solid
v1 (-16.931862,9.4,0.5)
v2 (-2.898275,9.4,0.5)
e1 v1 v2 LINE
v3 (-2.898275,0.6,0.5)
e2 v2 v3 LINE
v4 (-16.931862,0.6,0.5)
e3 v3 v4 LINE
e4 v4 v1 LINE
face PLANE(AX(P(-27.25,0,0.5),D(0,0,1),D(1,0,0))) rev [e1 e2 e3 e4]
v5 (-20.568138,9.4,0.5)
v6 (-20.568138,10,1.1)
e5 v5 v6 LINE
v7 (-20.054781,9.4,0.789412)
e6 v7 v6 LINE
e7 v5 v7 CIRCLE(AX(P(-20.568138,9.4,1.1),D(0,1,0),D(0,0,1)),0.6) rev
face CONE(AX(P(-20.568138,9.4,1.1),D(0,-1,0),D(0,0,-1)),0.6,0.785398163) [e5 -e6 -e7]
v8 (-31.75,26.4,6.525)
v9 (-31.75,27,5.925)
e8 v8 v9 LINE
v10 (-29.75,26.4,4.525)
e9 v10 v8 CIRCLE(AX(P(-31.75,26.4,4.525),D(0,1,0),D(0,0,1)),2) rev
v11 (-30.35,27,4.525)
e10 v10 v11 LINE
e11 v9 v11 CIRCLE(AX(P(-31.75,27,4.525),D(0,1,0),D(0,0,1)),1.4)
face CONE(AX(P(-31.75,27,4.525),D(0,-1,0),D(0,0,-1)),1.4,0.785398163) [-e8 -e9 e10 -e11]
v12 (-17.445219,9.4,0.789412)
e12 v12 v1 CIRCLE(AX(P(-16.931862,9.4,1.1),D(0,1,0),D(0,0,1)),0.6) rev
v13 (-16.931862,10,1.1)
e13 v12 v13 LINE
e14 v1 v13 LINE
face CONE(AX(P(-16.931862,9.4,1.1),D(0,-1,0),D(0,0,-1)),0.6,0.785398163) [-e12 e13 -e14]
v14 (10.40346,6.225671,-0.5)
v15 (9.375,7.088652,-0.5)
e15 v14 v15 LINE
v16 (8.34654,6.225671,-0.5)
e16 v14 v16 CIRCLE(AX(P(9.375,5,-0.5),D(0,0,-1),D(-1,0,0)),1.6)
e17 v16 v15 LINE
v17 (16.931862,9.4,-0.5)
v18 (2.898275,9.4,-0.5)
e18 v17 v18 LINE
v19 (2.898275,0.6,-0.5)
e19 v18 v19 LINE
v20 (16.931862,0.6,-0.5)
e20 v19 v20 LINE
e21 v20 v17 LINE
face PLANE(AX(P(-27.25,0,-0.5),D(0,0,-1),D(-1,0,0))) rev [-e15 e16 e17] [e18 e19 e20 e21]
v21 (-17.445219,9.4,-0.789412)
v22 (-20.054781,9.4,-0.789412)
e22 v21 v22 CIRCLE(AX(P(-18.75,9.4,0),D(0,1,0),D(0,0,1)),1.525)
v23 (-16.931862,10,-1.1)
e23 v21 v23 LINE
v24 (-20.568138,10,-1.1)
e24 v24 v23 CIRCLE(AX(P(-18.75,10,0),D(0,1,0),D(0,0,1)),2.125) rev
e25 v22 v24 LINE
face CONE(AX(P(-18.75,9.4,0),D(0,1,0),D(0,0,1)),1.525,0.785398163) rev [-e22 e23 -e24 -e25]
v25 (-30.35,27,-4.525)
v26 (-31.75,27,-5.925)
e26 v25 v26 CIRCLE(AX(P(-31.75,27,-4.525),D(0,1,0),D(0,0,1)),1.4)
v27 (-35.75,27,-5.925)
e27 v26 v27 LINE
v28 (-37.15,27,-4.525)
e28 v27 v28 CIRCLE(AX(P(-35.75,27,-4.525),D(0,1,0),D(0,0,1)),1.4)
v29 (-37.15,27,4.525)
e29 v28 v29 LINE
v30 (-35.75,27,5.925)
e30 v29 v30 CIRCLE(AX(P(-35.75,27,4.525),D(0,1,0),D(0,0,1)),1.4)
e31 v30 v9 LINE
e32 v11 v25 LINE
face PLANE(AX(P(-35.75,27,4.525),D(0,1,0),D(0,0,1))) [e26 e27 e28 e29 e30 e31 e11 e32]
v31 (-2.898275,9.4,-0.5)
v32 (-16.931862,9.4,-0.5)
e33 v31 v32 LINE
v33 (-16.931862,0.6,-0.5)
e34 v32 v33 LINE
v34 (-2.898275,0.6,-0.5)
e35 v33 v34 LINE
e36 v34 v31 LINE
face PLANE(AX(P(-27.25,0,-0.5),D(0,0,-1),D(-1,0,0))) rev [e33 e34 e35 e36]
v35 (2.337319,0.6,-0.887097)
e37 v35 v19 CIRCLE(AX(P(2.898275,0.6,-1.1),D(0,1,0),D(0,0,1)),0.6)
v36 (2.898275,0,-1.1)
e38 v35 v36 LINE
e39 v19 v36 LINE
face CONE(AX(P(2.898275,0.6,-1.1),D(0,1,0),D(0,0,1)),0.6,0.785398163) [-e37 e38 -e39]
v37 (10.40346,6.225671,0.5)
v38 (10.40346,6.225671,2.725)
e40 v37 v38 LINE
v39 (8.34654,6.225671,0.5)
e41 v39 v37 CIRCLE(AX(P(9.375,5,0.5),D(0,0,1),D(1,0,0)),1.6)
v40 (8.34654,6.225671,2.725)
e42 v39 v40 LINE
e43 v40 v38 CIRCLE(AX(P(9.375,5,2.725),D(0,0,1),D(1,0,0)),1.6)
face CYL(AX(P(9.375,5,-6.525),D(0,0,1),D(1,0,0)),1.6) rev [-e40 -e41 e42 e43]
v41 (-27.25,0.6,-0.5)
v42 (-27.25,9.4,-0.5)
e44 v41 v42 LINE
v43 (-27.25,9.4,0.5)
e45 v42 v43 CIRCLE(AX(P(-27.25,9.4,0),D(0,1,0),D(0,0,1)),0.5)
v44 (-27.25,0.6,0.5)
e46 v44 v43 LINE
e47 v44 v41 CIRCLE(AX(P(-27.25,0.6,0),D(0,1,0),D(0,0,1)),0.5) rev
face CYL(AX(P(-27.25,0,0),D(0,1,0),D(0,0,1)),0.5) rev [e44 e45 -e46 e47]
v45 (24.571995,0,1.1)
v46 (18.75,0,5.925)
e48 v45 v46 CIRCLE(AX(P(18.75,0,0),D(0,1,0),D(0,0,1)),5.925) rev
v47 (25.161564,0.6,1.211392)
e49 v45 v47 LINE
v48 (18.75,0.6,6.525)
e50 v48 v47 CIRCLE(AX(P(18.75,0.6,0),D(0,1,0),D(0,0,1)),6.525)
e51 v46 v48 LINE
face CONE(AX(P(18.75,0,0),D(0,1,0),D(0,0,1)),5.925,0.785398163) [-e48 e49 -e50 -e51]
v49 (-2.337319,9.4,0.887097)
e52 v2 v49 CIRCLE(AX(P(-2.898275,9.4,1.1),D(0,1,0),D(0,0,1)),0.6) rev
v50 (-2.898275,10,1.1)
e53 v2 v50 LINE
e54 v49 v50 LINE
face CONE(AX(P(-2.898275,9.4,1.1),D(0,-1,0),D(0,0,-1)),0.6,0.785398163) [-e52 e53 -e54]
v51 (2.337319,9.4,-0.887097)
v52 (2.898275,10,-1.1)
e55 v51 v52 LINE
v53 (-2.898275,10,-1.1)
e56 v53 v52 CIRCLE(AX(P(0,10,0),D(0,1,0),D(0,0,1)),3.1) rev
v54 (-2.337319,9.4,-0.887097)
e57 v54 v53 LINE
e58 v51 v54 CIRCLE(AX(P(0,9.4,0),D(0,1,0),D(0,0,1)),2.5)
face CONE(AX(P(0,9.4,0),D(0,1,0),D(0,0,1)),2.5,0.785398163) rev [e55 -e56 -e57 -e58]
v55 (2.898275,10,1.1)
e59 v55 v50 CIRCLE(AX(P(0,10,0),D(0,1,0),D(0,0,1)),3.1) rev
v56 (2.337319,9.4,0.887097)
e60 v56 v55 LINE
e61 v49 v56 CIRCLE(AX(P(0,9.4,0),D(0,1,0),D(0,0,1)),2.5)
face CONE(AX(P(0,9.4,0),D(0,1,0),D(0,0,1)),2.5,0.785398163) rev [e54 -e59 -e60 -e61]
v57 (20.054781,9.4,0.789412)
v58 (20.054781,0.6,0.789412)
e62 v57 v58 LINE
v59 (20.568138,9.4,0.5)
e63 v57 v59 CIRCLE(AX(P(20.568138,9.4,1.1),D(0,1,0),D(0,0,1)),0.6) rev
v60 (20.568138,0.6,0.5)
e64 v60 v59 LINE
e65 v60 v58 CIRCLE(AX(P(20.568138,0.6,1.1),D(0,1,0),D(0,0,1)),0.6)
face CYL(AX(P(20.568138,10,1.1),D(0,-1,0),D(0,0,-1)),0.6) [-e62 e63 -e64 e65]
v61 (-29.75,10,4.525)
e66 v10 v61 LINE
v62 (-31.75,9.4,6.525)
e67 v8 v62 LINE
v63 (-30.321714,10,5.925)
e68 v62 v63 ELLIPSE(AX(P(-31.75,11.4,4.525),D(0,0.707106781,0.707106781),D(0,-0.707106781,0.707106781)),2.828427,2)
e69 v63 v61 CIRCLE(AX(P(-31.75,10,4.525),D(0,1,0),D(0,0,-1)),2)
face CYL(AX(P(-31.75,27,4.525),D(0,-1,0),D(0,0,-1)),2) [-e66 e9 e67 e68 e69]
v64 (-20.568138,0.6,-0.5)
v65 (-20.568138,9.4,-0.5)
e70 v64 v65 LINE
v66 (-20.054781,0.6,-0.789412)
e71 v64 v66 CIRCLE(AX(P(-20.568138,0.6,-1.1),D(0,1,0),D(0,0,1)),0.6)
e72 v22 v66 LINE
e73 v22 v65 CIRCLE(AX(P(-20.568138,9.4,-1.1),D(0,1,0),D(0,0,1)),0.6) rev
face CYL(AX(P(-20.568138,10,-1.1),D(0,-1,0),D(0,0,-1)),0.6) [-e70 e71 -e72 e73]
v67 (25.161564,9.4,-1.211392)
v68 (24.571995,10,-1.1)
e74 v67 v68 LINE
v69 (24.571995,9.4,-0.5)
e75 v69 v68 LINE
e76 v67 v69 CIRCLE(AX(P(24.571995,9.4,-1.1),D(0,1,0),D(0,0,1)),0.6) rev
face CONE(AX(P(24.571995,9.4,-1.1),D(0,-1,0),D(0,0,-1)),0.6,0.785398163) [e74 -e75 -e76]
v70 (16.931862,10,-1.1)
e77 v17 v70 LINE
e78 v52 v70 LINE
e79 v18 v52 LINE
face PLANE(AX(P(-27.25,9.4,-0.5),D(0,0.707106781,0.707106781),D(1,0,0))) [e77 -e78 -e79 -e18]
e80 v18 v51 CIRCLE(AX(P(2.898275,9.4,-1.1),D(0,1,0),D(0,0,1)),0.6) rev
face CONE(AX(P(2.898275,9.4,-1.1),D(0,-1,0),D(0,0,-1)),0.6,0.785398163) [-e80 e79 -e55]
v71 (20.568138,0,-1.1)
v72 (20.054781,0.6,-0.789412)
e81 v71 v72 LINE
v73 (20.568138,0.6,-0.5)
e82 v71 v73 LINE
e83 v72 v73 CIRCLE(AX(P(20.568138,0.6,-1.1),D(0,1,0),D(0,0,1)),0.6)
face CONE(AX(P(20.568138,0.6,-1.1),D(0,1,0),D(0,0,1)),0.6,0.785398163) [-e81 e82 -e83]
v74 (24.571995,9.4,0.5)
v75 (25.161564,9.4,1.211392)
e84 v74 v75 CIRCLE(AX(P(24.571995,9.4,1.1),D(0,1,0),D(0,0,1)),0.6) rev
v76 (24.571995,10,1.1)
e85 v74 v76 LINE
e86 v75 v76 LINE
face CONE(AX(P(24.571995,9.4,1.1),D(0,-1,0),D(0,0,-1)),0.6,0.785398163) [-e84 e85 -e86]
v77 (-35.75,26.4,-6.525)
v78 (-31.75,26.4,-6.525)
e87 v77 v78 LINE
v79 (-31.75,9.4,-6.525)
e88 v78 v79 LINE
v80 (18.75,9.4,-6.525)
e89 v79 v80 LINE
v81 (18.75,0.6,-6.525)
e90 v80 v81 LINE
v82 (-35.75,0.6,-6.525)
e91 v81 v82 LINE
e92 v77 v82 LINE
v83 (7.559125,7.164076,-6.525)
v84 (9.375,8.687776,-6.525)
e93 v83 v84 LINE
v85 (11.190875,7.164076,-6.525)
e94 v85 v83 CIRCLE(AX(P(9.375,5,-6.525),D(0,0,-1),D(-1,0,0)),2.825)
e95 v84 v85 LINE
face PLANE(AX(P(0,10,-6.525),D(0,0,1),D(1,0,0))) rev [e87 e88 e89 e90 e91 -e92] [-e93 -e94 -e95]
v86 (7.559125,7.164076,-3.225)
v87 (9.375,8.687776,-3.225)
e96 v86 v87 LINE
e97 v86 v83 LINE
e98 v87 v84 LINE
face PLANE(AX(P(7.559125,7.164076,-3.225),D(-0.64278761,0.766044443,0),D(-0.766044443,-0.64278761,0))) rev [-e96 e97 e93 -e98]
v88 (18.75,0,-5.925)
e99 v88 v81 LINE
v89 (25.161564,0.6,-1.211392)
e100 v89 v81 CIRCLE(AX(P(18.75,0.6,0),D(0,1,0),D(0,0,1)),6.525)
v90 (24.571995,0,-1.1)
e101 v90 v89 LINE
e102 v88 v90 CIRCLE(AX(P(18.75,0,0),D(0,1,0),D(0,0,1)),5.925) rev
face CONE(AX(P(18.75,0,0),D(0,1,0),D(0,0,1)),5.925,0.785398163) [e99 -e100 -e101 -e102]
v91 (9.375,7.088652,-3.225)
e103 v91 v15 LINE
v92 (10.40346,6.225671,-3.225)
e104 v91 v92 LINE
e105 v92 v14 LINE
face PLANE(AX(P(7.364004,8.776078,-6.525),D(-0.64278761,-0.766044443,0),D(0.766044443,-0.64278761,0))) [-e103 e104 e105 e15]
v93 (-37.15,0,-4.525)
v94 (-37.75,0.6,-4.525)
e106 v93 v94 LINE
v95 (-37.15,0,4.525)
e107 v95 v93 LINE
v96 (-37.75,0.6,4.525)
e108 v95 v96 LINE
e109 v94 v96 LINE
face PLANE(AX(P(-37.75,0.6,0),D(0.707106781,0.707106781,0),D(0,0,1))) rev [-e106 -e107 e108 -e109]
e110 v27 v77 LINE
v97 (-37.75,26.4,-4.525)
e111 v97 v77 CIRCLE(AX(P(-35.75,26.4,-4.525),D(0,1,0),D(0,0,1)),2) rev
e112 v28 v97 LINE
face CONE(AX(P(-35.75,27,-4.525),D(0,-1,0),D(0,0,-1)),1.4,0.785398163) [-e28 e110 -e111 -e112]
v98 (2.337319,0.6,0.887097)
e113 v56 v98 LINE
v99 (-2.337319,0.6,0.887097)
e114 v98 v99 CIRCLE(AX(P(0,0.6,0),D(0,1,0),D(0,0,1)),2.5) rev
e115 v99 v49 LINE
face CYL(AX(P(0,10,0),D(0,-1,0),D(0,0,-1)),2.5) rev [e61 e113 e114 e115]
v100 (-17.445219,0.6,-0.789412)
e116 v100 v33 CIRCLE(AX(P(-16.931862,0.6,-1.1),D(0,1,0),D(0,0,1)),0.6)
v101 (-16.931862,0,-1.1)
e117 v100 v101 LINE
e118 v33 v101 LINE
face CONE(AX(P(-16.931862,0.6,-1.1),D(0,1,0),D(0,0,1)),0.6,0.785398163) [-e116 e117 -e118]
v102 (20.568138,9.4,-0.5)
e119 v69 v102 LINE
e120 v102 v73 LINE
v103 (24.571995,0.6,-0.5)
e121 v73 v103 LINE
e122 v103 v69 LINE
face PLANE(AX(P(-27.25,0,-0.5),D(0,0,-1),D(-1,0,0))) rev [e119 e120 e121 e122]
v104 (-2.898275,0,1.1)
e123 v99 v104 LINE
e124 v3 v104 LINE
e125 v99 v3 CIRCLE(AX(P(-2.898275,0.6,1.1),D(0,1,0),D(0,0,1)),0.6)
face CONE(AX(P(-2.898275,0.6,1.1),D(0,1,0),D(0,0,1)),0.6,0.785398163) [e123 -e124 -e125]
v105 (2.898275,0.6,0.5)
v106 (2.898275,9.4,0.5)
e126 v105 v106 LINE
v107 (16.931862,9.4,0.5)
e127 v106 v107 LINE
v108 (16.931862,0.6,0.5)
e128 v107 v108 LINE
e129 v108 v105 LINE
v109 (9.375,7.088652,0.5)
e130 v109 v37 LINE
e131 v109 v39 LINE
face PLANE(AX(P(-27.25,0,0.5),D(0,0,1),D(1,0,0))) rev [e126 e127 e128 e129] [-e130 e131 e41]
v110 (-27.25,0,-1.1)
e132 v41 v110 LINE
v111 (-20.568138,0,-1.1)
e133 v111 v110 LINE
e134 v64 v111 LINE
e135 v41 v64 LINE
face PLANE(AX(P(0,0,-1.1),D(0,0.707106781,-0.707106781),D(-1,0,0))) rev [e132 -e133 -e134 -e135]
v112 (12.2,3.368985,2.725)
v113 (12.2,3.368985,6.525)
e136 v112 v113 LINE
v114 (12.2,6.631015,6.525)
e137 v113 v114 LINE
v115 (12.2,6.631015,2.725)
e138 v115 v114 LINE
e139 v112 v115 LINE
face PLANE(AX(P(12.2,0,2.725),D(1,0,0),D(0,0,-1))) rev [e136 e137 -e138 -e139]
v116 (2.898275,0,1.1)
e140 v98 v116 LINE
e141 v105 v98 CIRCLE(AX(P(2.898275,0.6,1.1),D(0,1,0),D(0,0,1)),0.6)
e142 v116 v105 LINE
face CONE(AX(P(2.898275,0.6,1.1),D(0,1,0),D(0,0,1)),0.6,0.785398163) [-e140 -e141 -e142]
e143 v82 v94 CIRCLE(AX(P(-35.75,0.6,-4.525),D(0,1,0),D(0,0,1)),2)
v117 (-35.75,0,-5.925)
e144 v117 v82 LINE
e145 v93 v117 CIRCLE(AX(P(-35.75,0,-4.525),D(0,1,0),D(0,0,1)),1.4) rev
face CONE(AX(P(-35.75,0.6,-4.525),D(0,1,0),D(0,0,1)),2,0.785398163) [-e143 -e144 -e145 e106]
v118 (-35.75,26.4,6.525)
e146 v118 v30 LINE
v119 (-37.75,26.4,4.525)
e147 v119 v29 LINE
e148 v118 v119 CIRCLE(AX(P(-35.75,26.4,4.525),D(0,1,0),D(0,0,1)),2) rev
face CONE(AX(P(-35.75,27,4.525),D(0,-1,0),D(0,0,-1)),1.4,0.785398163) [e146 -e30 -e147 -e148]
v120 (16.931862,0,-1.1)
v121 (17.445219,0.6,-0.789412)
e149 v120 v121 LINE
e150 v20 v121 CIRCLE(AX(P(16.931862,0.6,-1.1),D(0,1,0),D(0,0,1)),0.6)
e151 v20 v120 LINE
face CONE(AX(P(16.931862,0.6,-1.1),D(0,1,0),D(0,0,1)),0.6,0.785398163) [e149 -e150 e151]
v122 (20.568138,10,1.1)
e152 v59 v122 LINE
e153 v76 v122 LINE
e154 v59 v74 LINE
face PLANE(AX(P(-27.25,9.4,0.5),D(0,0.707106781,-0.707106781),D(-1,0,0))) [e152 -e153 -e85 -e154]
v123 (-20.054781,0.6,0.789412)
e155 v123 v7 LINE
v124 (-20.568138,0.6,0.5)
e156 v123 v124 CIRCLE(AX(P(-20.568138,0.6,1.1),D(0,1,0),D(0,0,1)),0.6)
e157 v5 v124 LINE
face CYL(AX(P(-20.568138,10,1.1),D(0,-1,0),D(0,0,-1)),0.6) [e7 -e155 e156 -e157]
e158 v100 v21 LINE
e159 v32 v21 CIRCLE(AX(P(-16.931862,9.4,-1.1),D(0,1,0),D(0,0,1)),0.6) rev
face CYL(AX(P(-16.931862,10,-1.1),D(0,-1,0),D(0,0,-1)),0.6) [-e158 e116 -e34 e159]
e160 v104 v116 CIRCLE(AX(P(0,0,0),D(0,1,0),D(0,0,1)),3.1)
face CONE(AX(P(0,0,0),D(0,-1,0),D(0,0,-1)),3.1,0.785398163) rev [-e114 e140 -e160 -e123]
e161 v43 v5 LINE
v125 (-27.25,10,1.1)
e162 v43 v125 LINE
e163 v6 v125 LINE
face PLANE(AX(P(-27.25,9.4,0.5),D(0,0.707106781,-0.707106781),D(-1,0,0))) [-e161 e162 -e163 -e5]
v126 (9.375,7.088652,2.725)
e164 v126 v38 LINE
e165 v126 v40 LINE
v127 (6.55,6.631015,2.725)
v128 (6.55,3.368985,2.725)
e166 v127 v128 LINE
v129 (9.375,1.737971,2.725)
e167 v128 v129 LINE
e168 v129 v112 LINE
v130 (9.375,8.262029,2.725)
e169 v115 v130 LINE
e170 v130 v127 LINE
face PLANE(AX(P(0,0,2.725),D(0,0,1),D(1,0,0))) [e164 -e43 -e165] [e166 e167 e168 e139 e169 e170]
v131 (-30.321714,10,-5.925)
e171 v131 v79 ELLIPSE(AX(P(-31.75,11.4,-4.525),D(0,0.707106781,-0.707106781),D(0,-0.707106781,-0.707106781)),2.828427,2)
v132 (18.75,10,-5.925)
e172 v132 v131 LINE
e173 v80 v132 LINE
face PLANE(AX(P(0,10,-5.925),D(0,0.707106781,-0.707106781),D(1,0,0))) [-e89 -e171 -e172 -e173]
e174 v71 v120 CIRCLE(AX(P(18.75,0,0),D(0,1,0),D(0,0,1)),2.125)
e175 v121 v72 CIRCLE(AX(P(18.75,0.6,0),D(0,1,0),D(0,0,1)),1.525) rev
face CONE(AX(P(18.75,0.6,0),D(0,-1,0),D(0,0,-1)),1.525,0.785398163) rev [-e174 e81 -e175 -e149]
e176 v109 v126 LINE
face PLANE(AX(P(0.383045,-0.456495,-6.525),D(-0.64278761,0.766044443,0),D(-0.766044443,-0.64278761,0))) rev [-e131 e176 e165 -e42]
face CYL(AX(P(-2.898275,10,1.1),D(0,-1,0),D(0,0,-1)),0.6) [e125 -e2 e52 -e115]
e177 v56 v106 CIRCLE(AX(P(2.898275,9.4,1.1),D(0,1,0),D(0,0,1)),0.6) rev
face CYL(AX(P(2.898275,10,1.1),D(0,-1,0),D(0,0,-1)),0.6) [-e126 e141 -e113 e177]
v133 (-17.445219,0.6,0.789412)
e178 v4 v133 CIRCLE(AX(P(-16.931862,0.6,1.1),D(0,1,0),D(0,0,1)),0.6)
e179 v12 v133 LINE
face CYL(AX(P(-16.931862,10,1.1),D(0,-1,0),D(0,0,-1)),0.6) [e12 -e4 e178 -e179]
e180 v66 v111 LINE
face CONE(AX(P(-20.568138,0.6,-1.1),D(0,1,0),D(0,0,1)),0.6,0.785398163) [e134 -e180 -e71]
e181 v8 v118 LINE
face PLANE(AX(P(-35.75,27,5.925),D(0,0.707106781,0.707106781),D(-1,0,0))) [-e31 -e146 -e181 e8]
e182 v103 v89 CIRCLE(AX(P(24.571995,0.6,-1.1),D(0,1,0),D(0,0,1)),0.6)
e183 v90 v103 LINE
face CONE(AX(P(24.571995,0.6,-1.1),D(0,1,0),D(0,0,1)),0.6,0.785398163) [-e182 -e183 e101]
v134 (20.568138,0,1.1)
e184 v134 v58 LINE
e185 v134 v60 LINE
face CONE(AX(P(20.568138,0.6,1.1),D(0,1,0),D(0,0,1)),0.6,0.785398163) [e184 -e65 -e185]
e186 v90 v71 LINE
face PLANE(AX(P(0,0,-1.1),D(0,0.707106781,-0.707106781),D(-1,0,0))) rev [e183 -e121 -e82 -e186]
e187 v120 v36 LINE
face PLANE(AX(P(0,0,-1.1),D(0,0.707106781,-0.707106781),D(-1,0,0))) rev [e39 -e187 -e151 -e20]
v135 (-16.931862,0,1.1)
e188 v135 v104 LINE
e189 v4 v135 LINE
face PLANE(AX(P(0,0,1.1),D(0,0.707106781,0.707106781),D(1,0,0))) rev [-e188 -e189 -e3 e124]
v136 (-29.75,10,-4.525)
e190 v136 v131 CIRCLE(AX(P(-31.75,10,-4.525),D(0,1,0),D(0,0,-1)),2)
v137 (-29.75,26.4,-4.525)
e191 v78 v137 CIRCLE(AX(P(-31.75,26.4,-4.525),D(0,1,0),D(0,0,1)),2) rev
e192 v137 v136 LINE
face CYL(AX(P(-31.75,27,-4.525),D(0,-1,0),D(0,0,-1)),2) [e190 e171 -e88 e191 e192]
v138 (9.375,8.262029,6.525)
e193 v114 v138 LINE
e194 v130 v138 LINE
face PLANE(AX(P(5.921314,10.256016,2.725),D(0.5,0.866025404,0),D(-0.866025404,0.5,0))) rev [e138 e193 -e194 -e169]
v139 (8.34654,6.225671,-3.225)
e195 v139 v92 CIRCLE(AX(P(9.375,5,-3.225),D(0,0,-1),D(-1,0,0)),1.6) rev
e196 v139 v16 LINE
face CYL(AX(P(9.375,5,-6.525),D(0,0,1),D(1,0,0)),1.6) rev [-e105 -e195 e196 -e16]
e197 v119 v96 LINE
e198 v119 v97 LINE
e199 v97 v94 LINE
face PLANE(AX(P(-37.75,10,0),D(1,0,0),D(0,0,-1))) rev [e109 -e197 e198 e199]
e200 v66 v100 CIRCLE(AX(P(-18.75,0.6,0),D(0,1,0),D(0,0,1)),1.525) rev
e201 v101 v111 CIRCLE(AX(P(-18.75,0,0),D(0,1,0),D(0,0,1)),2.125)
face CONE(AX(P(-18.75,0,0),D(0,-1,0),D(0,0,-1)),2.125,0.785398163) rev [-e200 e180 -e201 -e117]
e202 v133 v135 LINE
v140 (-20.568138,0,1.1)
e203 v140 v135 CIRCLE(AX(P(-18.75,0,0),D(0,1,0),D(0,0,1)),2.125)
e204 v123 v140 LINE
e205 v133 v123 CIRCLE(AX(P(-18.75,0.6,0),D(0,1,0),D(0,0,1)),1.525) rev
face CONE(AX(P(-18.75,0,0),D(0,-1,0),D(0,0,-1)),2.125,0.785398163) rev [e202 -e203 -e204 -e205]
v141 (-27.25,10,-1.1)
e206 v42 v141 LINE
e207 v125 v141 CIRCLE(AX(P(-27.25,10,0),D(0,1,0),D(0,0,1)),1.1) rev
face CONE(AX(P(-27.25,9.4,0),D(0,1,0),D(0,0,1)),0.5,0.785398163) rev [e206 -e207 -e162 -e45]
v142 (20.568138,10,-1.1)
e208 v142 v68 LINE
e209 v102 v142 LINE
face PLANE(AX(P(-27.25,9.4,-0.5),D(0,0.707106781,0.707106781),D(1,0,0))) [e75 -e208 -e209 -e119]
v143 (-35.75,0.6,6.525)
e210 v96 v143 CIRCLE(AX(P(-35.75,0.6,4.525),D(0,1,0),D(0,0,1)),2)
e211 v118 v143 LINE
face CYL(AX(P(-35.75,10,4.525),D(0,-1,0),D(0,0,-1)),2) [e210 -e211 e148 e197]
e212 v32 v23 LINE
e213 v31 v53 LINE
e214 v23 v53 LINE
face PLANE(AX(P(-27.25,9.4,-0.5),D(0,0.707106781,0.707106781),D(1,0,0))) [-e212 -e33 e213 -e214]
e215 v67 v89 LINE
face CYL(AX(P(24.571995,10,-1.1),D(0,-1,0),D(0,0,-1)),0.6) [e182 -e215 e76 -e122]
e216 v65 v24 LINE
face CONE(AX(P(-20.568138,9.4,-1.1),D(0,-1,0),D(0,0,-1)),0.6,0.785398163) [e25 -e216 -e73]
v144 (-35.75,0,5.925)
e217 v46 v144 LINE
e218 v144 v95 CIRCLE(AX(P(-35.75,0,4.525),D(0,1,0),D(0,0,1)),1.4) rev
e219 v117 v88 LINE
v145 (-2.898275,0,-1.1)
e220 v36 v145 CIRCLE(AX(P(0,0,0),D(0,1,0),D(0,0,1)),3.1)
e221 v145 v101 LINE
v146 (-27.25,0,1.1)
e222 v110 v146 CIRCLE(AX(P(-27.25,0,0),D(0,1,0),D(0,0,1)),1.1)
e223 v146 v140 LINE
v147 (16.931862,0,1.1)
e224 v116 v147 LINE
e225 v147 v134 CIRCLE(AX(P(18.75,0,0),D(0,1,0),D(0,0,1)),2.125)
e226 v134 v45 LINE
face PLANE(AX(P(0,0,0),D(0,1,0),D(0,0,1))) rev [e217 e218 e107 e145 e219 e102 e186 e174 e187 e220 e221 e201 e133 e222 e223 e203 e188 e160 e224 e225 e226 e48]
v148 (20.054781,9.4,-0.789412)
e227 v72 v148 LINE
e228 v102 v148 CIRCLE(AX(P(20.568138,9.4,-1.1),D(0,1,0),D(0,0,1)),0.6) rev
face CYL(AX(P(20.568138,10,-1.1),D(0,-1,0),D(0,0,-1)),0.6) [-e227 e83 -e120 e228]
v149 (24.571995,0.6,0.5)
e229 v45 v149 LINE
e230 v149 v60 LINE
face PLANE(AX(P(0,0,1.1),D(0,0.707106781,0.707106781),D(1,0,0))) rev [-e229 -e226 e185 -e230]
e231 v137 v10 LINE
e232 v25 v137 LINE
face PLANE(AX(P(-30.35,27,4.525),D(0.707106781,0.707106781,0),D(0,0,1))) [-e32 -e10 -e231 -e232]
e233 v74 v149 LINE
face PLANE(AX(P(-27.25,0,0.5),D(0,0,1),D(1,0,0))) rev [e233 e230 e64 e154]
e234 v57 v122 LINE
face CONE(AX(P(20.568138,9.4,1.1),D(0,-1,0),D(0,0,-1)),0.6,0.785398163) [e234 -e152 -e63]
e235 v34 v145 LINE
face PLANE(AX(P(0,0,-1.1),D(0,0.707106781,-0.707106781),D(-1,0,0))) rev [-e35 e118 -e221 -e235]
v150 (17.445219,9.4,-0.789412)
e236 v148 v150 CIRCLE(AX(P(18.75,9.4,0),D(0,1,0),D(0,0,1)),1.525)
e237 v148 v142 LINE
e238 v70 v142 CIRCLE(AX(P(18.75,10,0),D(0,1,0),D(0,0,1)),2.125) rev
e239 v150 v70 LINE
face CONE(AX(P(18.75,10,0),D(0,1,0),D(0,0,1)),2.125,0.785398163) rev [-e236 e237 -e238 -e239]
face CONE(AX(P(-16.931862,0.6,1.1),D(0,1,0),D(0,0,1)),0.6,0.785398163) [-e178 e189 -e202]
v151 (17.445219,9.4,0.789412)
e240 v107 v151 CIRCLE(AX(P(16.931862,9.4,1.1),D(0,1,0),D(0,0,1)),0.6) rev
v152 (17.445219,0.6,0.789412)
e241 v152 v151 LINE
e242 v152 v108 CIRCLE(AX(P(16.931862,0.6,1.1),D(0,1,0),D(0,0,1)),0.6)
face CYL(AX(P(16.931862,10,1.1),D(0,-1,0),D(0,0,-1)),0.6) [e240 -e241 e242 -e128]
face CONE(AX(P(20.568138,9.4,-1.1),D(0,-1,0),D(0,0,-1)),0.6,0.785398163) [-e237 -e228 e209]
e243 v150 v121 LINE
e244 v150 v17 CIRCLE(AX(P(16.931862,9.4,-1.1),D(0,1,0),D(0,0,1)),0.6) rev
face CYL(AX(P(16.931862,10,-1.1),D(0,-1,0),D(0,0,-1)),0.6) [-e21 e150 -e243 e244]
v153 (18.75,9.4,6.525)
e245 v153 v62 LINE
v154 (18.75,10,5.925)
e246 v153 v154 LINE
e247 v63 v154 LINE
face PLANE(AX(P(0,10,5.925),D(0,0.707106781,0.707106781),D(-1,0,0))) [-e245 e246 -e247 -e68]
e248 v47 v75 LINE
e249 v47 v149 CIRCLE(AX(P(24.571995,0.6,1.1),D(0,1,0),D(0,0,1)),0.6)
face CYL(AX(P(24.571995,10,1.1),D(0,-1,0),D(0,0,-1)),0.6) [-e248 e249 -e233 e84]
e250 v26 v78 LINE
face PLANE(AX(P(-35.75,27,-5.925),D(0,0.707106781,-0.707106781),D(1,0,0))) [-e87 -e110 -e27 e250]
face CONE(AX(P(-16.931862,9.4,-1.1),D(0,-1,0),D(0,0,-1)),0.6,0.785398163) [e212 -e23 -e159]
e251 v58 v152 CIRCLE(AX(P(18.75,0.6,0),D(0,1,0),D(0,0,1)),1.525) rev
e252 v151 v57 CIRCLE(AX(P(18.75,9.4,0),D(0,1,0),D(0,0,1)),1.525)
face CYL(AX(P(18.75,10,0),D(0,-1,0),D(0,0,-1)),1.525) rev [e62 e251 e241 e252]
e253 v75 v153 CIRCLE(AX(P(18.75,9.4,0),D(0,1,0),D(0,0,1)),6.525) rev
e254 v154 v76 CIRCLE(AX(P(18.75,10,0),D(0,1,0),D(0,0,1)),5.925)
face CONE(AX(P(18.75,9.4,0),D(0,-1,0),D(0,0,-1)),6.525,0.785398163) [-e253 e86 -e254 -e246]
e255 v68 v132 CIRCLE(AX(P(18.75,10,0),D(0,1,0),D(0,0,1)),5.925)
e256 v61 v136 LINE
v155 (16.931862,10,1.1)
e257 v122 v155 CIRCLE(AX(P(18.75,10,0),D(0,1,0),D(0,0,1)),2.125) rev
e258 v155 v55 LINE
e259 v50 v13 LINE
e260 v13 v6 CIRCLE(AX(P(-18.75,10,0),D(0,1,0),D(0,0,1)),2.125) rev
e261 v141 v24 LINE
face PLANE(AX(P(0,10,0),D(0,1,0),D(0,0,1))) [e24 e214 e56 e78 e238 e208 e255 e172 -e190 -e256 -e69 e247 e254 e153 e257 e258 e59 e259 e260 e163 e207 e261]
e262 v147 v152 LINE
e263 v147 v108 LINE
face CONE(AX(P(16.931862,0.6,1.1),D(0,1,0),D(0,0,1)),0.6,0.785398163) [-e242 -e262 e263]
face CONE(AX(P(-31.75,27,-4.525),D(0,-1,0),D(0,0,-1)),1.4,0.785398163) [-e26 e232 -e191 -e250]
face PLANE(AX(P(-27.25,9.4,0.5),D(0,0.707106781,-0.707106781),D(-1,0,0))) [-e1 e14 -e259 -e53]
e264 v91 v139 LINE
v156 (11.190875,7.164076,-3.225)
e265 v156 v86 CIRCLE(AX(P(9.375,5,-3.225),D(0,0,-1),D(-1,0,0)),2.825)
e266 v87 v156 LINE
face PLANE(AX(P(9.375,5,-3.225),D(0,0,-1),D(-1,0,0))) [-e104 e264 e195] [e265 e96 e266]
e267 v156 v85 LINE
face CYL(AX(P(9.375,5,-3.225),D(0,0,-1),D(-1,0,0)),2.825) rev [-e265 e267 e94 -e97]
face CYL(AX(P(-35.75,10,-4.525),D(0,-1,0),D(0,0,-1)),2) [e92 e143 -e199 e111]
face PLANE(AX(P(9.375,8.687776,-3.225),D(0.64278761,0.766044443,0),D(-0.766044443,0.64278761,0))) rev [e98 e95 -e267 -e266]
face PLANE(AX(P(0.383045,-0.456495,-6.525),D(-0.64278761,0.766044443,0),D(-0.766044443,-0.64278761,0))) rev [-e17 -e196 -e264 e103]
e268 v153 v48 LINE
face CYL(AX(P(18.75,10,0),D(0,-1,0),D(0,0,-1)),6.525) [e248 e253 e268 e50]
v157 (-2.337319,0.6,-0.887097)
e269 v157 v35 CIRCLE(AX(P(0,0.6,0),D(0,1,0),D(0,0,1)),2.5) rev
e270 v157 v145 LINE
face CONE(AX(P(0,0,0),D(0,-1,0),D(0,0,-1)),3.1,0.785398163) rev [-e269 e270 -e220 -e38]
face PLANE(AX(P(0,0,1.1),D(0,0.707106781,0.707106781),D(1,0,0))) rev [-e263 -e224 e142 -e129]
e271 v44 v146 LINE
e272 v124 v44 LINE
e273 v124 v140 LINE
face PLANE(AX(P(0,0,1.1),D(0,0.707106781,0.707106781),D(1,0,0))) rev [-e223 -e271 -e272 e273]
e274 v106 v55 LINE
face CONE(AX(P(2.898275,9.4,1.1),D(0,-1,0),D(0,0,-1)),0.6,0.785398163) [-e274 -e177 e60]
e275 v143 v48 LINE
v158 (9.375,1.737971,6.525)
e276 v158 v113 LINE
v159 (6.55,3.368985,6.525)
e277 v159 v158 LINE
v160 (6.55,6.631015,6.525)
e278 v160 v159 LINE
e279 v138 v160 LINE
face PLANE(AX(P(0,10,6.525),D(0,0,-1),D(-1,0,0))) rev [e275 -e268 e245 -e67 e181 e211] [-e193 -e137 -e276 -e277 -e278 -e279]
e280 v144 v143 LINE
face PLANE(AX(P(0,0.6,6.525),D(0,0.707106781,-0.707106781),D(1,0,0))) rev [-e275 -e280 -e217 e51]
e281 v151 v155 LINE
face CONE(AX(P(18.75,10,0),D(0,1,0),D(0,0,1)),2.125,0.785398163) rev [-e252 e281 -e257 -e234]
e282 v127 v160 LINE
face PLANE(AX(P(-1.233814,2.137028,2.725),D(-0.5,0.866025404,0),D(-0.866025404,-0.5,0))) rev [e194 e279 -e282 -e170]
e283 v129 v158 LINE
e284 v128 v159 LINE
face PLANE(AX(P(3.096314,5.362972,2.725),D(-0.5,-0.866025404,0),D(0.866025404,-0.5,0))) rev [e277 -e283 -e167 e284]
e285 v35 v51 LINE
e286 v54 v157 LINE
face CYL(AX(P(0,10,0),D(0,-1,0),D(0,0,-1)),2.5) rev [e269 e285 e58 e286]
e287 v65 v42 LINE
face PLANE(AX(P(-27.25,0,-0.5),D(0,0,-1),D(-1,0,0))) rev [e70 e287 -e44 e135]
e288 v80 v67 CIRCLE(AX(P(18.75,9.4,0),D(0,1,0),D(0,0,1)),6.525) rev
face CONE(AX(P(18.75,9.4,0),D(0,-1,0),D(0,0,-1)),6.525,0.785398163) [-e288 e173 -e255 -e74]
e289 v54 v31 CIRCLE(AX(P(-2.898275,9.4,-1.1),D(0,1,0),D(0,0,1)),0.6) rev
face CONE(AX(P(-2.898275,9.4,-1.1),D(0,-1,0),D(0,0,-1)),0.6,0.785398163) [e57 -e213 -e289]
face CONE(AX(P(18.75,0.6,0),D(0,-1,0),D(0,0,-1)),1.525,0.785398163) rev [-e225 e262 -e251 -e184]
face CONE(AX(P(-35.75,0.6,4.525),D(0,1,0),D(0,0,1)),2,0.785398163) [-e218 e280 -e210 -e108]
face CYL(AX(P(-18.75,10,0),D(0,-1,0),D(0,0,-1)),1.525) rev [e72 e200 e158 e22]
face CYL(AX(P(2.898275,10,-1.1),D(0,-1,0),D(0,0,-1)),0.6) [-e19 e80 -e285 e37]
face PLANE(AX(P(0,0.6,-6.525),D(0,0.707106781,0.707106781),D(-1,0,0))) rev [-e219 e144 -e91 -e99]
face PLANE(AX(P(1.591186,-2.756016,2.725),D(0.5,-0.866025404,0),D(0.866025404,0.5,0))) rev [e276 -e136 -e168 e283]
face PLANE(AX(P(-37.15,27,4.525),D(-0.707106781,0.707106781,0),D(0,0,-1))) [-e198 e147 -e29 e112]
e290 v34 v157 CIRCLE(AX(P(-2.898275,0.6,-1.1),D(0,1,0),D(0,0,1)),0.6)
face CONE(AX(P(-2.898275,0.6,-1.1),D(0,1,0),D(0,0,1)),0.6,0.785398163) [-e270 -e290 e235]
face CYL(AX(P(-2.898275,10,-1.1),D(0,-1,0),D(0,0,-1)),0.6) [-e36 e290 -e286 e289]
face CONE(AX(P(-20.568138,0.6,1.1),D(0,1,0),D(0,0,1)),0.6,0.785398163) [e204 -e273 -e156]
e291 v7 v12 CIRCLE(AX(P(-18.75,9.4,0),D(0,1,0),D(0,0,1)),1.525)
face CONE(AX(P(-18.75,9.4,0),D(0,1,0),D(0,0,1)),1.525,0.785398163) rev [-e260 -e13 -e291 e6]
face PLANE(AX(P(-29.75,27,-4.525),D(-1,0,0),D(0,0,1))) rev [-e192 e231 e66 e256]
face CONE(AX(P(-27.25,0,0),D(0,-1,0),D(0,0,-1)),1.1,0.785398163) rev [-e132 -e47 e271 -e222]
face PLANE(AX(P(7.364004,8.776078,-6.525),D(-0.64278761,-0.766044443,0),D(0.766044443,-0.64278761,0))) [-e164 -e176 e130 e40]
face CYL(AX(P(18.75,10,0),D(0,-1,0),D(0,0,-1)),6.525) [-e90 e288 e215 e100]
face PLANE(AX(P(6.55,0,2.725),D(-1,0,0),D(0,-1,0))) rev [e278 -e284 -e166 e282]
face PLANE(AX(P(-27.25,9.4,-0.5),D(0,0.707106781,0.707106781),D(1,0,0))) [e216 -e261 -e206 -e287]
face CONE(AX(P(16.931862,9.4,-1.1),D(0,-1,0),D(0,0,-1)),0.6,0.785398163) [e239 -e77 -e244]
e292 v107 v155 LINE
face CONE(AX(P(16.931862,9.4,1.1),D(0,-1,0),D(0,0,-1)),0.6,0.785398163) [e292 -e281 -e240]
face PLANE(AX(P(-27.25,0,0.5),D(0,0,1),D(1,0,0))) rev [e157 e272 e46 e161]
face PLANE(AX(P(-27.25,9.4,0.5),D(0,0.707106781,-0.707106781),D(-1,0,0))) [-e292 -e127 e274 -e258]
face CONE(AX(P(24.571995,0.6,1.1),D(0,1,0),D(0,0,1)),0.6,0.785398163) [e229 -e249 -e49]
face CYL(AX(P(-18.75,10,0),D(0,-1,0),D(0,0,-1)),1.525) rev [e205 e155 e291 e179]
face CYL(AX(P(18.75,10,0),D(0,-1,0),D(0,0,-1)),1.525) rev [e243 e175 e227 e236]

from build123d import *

# Parameters (mm, degrees)
SKETCH1_R               = 1.525
SKETCH1_R_2             = 2.5
SKETCH1_R_3             = 1.5
MAIN_BODY_DEPTH         = 10
SKETCH1_4_R             = 2.5
LEAD_SCREW_CUTOUT_DEPTH = 40.593410121
LIMIT_SWITCH_TAB_DEPTH  = 17
CUT_EXTRUDE1_DEPTH      = 42.912266999
FILLET1_R               = 0.6
CHAMFER1_SIZE           = 0.6
CUT_EXTRUDE2_DEPTH      = 3.8
CUT_EXTRUDE3_DEPTH      = 49.211668712
CUT_EXTRUDE4_DEPTH      = 3.3


with BuildPart() as part:
    # Sketch1 → Main body (new body)
    # profile 1 of 3: a face of its own
    with BuildSketch(Plane(origin=(0, 0, 0), x_dir=(1, 0, 0), z_dir=(0, 1, 0))):
        with BuildLine():
            Line((18.75, 6.525), (-18.75, 6.525))
            Line((-18.75, 6.525), (-35.75, 6.525))
            ThreePointArc((-35.75, 6.525), (-37.164213562, 5.939213562), (-37.75, 4.525))
            Line((-37.75, 4.525), (-37.75, -4.525))
            ThreePointArc((-37.75, -4.525), (-37.164213562, -5.939213562), (-35.75, -6.525))
            Line((-35.75, -6.525), (-18.75, -6.525))
            Line((-18.75, -6.525), (18.75, -6.525))
            ThreePointArc((18.75, -6.525), (25.275, 0), (18.75, 6.525))
        make_face()
        with Locations(Location((-18.75, 0, 0), (0, 0, 270))):
            Circle(SKETCH1_R, mode=Mode.SUBTRACT)
        Circle(SKETCH1_R_2, mode=Mode.SUBTRACT)
        with Locations(Location((18.75, 0, 0), (0, 0, 270))):
            Circle(SKETCH1_R, mode=Mode.SUBTRACT)
    # profile 2 of 3: a face of its own
    with BuildSketch(Plane(origin=(0, 0, 0), x_dir=(1, 0, 0), z_dir=(0, 1, 0))):
        Circle(SKETCH1_R_2)
        Circle(SKETCH1_R_3, mode=Mode.SUBTRACT)
    # profile 3 of 3: a face of its own
    with BuildSketch(Plane(origin=(0, 0, 0), x_dir=(1, 0, 0), z_dir=(0, 1, 0))):
        Circle(SKETCH1_R_3)
    extrude(amount=MAIN_BODY_DEPTH)

    # Sketch1<4> → Lead screw cutout (cut, through all)
    with BuildSketch(Plane(origin=(0, 0, 0), x_dir=(1, 0, 0), z_dir=(0, 1, 0))):
        with Locations(Location((0, 0, 0), (0, 0, 270))):
            Circle(SKETCH1_4_R)
    extrude(amount=LEAD_SCREW_CUTOUT_DEPTH, mode=Mode.SUBTRACT)

    # Limit switch tab sketch → Limit switch tab (add)
    with BuildSketch(Plane(origin=(0, 10, 0), x_dir=(1, 0, 0), z_dir=(0, 1, 0))):
        with BuildLine():
            Line((-37.75, 4.525), (-37.75, -4.525))
            ThreePointArc((-37.75, -4.525), (-37.164213562, -5.939213562), (-35.75, -6.525))
            Line((-35.75, -6.525), (-31.75, -6.525))
            ThreePointArc((-31.75, -6.525), (-30.335786438, -5.939213562), (-29.75, -4.525))
            Line((-29.75, -4.525), (-29.75, 4.525))
            ThreePointArc((-29.75, 4.525), (-30.335786438, 5.939213562), (-31.75, 6.525))
            Line((-31.75, 6.525), (-35.75, 6.525))
            ThreePointArc((-35.75, 6.525), (-37.164213562, 5.939213562), (-37.75, 4.525))
        make_face()
    extrude(amount=LIMIT_SWITCH_TAB_DEPTH)

    # Sketch2 → Cut-Extrude1 (cut, through all)
    with BuildSketch(Plane(origin=(0, 10, 0), x_dir=(1, 0, 0), z_dir=(0, 1, 0))):
        with BuildLine():
            Line((-27.25, 0.5), (27.993605311, 0.5))
            Line((27.993605311, 0.5), (27.993605311, -0.5))
            Line((27.993605311, -0.5), (-27.25, -0.5))
            ThreePointArc((-27.25, -0.5), (-27.75, 0), (-27.25, 0.5))
        make_face()
    extrude(amount=-CUT_EXTRUDE1_DEPTH, mode=Mode.SUBTRACT)

    # Fillet1
    fillet1_edges = [part.edges().sort_by_distance(p)[0] for p in [
        (2.449489743, 5, 0.5),
        (-2.449489743, 5, 0.5),
        (-2.449489743, 5, -0.5),
        (2.449489743, 5, -0.5),
        (-17.309297047, 5, -0.5),
        (-20.190702953, 5, -0.5),
        (20.190702953, 5, -0.5),
        (17.309297047, 5, -0.5),
        (25.255814707, 5, -0.5),
        (-20.190702953, 5, 0.5),
        (-17.309297047, 5, 0.5),
        (17.309297047, 5, 0.5),
        (20.190702953, 5, 0.5),
        (25.255814707, 5, 0.5),
    ]]
    fillet(fillet1_edges, radius=FILLET1_R)

    # Chamfer1
    chamfer1_edges = [part.edges().sort_by_distance(p)[0] for p in [
        (22.913609585, 0, -5.023940706),
        (-8.5, 0, 6.525),
        (-37.164213562, 0, 5.939213562),
        (-37.75, 0, 0),
        (9.915068783, 10, -0.5),
        (9.915068783, 0, -0.5),
        (22.570066358, 0, -0.5),
        (-37.164213562, 0, -5.939213562),
        (18.75, 0, -1.525),
        (0, 0, -2.5),
        (-9.915068783, 0, -0.5),
        (-18.75, 0, -1.525),
        (-23.909068892, 0, -0.5),
        (-18.75, 0, 1.525),
        (-9.915068783, 0, 0.5),
        (0, 0, 2.5),
        (-8.5, 0, -6.525),
        (9.915068783, 0, 0.5),
        (18.75, 0, 1.525),
        (22.570066358, 0, 0.5),
        (22.913609585, 0, 5.023940706),
        (-20.273479457, 0, -0.577337135),
        (-17.226520543, 0, -0.577337135),
        (-20.273479457, 0, 0.577337135),
        (-17.226520543, 0, 0.577337135),
        (-2.557498249, 0, 0.606167065),
        (-2.557498249, 0, -0.606167065),
        (2.557498249, 0, 0.606167065),
        (17.226520543, 0, -0.577337135),
        (17.226520543, 0, 0.577337135),
        (20.273479457, 0, 0.577337135),
        (20.273479457, 0, -0.577337135),
        (25.033966492, 0, -0.717139348),
        (25.033966492, 0, 0.717139348),
        (2.557498249, 0, -0.606167065),
        (0, 10, -2.5),
        (22.570066358, 10, -0.5),
        (22.913609585, 10, 5.023940706),
        (22.570066358, 10, 0.5),
        (18.75, 10, 1.525),
        (9.915068783, 10, 0.5),
        (0, 10, 2.5),
        (-9.915068783, 10, 0.5),
        (-18.75, 10, 1.525),
        (-23.909068892, 10, -0.5),
        (-18.75, 10, -1.525),
        (-9.915068783, 10, -0.5),
        (18.75, 10, -1.525),
        (-20.273479457, 10, -0.577337135),
        (-17.226520543, 10, -0.577337135),
        (-20.273479457, 10, 0.577337135),
        (-17.226520543, 10, 0.577337135),
        (-2.557498249, 10, 0.606167065),
        (-2.557498249, 10, -0.606167065),
        (2.557498249, 10, 0.606167065),
        (17.226520543, 10, -0.577337135),
        (17.226520543, 10, 0.577337135),
        (20.273479457, 10, 0.577337135),
        (20.273479457, 10, -0.577337135),
        (25.033966492, 10, -0.717139348),
        (25.033966492, 10, 0.717139348),
        (2.557498249, 10, -0.606167065),
        (-6.5, 10, -6.525),
        (-6.5, 10, 6.525),
        (-37.164213562, 27, 5.939213562),
        (-33.75, 27, 6.525),
        (-30.335786438, 27, 5.939213562),
        (-29.75, 27, 0),
        (-30.335786438, 27, -5.939213562),
        (-33.75, 27, -6.525),
        (-37.164213562, 27, -5.939213562),
        (-37.75, 27, 0),
        (22.913609585, 10, -5.023940706),
        (-23.909068892, 0, 0.5),
        (-27.75, 0, 0),
        (-27.75, 10, 0),
        (-23.909068892, 10, 0.5),
    ]]
    chamfer(chamfer1_edges, length=CHAMFER1_SIZE - 0.0001)  # a hair under: the kernel refuses the full size

    # Sketch3 → Cut-Extrude2 (cut)
    # profile 1 of 2: a face of its own
    with BuildSketch(Plane.XY.offset(6.525)):
        Polygon((12.2, 3.36898549), (12.2, 6.63101451), (9.375, 8.262029021), (6.55, 6.63101451), (6.55, 3.36898549), (9.375, 1.737970979), align=None)
        with BuildLine():
            ThreePointArc((8.346539825, 6.225671109), (9.375, 3.4), (10.403460175, 6.225671109))
            Line((10.403460175, 6.225671109), (9.375, 7.088651663))
            Line((9.375, 7.088651663), (8.346539825, 6.225671109))
        make_face(mode=Mode.SUBTRACT)
    # profile 2 of 2: a face of its own
    with BuildSketch(Plane.XY.offset(6.525)):
        with BuildLine():
            Line((9.375, 7.088651663), (8.346539825, 6.225671109))
            ThreePointArc((8.346539825, 6.225671109), (9.375, 3.4), (10.403460175, 6.225671109))
            Line((10.403460175, 6.225671109), (9.375, 7.088651663))
        make_face()
    extrude(amount=-CUT_EXTRUDE2_DEPTH, mode=Mode.SUBTRACT)

    # Sketch3<3> → Cut-Extrude3 (cut, through all)
    with BuildSketch(Plane.XY.offset(6.525)):
        with BuildLine():
            Line((9.375, 7.088651663), (8.346539825, 6.225671109))
            ThreePointArc((8.346539825, 6.225671109), (9.375, 3.4), (10.403460175, 6.225671109))
            Line((10.403460175, 6.225671109), (9.375, 7.088651663))
        make_face()
    extrude(amount=-CUT_EXTRUDE3_DEPTH, mode=Mode.SUBTRACT)

    # Sketch4 → Cut-Extrude4 (cut)
    with BuildSketch(Plane(origin=(0, 0, -6.525), x_dir=(-1, 0, 0), z_dir=(0, 0, -1))):
        with BuildLine():
            Line((-9.375, 8.687775592), (-11.190874997, 7.164075552))
            ThreePointArc((-11.190874997, 7.164075552), (-9.375, 2.175), (-7.559125003, 7.164075552))
            Line((-7.559125003, 7.164075552), (-9.375, 8.687775592))
        make_face()
    extrude(amount=-CUT_EXTRUDE4_DEPTH, mode=Mode.SUBTRACT)


solid = part.part
